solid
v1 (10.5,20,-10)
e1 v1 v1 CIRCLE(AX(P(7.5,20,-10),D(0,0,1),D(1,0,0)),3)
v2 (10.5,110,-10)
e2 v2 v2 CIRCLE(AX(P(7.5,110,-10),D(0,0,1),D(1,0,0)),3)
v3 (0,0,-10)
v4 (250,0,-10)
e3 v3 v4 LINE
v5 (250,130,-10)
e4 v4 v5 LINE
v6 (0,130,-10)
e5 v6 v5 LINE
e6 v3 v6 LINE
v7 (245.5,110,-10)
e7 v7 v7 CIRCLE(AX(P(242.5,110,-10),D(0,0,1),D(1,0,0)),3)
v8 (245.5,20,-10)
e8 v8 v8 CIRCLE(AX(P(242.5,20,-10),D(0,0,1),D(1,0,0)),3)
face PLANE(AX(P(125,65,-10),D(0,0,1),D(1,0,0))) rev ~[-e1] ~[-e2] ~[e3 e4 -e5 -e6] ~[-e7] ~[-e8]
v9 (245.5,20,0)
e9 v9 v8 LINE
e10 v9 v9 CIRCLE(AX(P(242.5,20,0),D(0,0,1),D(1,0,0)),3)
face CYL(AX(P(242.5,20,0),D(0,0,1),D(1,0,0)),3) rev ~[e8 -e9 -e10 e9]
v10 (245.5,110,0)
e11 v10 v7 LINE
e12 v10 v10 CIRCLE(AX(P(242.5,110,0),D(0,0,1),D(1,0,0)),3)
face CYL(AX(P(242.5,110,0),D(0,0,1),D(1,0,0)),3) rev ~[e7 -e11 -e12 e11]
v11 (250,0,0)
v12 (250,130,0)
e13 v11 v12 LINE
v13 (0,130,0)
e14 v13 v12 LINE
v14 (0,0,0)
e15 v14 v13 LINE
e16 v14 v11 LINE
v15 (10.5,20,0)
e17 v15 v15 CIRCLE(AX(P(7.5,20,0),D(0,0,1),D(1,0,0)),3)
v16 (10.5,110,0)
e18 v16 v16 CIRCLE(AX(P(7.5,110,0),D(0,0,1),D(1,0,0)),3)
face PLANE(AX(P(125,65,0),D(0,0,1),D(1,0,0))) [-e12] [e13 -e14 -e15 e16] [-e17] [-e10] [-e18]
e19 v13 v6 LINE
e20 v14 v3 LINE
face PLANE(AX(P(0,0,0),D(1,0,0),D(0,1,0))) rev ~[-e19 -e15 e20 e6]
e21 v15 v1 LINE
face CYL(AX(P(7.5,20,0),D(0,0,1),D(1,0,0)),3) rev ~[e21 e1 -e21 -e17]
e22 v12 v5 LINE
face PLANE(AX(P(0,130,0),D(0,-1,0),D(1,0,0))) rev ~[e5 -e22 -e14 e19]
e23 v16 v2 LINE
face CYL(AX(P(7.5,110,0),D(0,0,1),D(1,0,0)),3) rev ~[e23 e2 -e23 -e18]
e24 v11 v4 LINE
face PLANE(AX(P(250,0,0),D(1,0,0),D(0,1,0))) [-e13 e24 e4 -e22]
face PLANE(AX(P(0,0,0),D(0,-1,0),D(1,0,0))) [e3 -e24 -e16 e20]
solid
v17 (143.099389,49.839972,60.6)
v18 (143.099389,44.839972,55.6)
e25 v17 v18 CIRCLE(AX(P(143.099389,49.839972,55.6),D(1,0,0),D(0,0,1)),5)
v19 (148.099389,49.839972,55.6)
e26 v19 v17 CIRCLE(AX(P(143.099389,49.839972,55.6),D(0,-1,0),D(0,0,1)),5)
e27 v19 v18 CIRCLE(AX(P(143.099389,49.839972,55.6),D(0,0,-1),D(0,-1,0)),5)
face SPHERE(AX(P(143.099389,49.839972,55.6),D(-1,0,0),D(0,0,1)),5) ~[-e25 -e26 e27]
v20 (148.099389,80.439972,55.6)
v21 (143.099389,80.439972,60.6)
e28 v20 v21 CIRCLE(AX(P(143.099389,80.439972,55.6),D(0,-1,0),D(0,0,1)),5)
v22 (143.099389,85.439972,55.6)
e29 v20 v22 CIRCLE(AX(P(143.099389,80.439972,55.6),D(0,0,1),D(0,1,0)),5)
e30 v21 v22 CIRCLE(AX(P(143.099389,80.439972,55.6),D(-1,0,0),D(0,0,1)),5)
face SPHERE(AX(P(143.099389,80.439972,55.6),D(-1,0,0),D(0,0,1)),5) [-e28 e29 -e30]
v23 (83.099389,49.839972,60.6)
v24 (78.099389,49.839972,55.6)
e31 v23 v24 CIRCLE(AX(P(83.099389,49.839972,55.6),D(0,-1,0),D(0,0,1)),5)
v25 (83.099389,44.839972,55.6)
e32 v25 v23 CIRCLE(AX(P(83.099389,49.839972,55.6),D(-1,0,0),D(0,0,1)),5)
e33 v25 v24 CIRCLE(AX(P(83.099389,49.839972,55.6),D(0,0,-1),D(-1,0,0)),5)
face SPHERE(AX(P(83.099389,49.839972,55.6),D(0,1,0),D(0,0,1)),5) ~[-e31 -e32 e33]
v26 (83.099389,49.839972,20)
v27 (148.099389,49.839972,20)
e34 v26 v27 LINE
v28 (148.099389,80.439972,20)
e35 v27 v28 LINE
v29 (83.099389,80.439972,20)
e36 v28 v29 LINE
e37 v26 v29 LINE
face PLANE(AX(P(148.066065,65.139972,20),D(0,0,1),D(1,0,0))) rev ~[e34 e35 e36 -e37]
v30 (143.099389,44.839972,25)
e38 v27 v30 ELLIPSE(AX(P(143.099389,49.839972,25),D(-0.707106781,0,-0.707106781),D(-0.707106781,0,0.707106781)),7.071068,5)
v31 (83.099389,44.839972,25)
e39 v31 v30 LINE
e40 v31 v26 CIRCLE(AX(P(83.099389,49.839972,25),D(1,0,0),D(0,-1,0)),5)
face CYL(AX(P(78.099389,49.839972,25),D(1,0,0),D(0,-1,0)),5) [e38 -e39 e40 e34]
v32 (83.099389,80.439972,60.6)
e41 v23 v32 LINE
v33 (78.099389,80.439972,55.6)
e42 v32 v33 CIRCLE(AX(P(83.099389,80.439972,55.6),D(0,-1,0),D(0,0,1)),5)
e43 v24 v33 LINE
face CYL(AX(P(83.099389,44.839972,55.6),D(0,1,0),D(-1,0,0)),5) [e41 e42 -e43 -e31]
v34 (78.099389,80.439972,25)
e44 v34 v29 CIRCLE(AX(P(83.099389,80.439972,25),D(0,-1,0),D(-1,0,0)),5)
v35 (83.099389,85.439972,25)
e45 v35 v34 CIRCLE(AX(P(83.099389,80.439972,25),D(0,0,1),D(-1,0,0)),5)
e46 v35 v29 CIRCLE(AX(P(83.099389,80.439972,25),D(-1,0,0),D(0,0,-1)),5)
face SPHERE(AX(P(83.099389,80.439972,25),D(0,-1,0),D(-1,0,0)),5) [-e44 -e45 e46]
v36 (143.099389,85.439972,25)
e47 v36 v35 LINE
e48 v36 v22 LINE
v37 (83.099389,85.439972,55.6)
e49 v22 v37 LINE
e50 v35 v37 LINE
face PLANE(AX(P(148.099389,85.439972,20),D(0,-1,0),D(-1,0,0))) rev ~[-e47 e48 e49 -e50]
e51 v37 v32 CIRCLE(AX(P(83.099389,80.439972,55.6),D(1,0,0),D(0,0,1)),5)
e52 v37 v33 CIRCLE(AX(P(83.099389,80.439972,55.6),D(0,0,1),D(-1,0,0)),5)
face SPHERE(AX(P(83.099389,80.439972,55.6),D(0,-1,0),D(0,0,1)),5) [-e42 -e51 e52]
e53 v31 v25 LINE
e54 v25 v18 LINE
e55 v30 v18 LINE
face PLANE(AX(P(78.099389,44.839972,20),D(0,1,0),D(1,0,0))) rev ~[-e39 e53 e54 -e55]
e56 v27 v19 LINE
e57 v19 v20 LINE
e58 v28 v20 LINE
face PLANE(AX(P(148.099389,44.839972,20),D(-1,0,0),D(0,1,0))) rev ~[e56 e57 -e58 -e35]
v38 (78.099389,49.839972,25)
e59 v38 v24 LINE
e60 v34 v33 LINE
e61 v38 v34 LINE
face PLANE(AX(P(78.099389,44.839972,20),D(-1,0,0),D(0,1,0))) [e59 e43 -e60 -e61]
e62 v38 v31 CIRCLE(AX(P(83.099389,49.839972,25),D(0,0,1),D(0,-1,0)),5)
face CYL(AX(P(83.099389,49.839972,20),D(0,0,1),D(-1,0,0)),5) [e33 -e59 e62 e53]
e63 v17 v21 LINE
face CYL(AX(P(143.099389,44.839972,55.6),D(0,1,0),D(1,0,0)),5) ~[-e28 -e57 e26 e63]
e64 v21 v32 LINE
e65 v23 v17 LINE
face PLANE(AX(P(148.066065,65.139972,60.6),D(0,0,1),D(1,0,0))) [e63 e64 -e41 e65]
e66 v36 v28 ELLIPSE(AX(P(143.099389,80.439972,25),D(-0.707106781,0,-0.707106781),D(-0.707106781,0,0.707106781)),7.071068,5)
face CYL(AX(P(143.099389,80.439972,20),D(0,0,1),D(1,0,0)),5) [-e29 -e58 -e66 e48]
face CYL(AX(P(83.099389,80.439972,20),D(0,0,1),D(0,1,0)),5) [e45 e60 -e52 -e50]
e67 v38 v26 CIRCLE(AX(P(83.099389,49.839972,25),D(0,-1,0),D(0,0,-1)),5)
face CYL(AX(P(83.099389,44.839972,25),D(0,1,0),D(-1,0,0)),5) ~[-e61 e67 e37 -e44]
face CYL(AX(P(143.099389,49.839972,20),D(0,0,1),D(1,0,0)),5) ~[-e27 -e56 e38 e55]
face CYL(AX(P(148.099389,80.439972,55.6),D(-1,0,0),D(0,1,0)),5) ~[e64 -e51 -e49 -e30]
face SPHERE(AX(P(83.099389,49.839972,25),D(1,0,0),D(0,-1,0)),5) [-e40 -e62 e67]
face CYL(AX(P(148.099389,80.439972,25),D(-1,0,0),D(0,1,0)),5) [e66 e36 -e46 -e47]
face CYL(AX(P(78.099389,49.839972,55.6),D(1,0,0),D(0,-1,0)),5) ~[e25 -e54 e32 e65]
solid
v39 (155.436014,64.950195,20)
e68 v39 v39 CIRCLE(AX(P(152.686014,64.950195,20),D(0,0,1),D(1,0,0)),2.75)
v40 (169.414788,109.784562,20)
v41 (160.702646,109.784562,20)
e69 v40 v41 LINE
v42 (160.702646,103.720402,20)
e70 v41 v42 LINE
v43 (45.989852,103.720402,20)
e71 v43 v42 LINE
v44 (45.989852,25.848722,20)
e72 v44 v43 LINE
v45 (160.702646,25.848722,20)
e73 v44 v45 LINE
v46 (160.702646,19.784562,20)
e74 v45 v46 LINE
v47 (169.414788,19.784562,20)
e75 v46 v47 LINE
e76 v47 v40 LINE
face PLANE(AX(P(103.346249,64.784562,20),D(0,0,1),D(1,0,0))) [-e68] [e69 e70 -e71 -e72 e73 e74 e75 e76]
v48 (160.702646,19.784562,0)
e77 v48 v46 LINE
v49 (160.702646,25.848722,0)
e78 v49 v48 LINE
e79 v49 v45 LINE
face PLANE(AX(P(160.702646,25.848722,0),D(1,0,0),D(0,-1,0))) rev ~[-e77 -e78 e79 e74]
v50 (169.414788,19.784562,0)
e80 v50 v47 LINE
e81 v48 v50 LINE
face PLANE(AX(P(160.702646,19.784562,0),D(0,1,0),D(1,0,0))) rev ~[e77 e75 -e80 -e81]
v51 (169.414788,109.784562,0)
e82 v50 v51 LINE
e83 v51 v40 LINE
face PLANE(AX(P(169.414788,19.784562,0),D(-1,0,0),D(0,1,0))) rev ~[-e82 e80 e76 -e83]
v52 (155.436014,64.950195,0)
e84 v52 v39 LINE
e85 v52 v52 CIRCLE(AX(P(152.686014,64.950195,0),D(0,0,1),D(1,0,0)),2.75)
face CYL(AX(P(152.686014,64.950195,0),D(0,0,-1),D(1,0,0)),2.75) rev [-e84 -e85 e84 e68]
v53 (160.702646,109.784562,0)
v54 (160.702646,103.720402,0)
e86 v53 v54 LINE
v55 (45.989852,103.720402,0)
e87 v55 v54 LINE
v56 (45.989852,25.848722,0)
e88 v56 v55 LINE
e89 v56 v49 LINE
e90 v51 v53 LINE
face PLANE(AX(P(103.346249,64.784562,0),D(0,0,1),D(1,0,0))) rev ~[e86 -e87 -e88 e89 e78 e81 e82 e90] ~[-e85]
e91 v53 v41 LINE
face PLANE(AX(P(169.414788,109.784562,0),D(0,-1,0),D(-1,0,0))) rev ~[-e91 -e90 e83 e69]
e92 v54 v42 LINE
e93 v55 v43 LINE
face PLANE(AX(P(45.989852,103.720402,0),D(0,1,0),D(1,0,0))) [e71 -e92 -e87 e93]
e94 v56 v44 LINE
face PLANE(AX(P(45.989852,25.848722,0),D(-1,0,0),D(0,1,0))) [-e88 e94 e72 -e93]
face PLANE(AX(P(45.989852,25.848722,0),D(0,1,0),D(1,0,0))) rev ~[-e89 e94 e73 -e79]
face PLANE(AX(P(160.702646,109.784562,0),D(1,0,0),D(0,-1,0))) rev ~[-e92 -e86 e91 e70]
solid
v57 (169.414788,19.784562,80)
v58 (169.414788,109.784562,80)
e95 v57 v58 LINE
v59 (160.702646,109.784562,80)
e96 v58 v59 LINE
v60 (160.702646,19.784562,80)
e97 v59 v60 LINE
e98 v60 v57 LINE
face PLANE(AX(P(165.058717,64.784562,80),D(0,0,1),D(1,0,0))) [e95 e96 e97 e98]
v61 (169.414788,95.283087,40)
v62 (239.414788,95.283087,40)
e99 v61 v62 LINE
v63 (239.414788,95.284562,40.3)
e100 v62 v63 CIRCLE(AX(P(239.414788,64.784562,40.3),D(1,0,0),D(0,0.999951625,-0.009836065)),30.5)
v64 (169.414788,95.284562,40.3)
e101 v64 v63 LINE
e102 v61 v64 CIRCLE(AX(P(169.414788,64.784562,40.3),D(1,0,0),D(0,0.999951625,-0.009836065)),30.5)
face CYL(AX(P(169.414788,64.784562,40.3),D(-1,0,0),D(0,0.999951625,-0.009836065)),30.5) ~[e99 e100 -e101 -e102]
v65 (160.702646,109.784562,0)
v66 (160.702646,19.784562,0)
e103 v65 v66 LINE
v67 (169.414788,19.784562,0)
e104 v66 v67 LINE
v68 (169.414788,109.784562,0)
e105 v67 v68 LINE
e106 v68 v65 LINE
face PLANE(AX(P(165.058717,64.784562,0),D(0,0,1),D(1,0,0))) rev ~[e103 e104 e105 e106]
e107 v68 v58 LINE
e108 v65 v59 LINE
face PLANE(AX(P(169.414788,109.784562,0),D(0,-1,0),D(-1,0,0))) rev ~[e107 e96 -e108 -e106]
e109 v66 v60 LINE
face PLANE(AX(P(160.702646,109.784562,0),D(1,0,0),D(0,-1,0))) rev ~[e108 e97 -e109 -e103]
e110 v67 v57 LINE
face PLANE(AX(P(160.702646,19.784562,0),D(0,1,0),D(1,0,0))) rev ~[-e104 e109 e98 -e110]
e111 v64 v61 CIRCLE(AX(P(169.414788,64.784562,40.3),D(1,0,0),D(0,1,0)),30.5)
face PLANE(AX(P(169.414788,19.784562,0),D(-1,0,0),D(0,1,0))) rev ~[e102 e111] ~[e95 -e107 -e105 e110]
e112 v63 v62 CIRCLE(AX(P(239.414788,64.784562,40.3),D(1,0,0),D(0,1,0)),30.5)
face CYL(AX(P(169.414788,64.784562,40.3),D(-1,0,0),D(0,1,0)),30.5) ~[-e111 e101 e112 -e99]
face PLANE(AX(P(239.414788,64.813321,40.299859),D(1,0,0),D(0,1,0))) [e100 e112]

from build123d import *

# Parameters (mm, degrees)
F0_W     = 250
F0_H     = 130
F0_R     = 3
F1_DEPTH = 10
F2_W     = 114.71279338
F2_H     = 77.8716804087
F2_R     = 2.75
F3_DEPTH = 20
F4_DEPTH = 80
F6_W     = 0.0666481256
F6_H     = 40.6
F6_W_2   = 69.9333518744
F7_DEPTH = 40.6
F8_R     = 5
F9_DEPTH = 70


with BuildPart() as f1:
    # F0 (on Top) → F1 (new body)
    with BuildSketch(Plane.XY):
        with Locations((125, 65)):
            Rectangle(F0_W, F0_H)
        with Locations((7.5, 20)):
            Circle(F0_R, mode=Mode.SUBTRACT)
        with Locations((242.5, 20)):
            Circle(F0_R, mode=Mode.SUBTRACT)
        with Locations((7.5, 110)):
            Circle(F0_R, mode=Mode.SUBTRACT)
        with Locations((242.5, 110)):
            Circle(F0_R, mode=Mode.SUBTRACT)
    extrude(amount=-F1_DEPTH)


with BuildPart() as f3:
    # F2 (on Top) → F3 (new body)
    with BuildSketch(Plane.XY):
        with Locations((103.3462490886, 64.7845622897)):
            Rectangle(F2_W, F2_H)
        with Locations((152.6860141896, 64.9501949326)):
            Circle(F2_R, mode=Mode.SUBTRACT)
        Polygon((160.7026457787, 109.7845622897), (160.7026457787, 103.7204024941), (160.7026457787, 25.8487220854), (160.7026457787, 19.7845622897), (169.4147884846, 19.7845622897), (169.4147884846, 109.7845622897), align=None)
    extrude(amount=F3_DEPTH)


with BuildPart() as f4:
    # F2 (on Top) → F4 (new body)
    with BuildSketch(Plane.XY):
        Polygon((160.7026457787, 109.7845622897), (160.7026457787, 103.7204024941), (160.7026457787, 25.8487220854), (160.7026457787, 19.7845622897), (169.4147884846, 19.7845622897), (169.4147884846, 109.7845622897), align=None)
    extrude(amount=F4_DEPTH)

    # F5 (on face) → F9 (join)
    with BuildSketch(Plane.YZ.offset(169.4147884846)):
        with BuildLine():
            ThreePointArc((95.2830868442, 40), (95.2841934261, 40.1499981859), (95.2845622897, 40.3))
            ThreePointArc((95.2845622897, 40.3), (64.6345604756, 70.7996311364), (34.2860377352, 40))
            ThreePointArc((34.2860377352, 40), (64.7845622897, 9.8), (95.2830868442, 40))
        make_face()
    extrude(amount=F9_DEPTH)


with BuildPart() as f7:
    # F6 (on face) → F7 (new body)
    with BuildSketch(Plane.XY.offset(20)):
        with Locations((148.0660647154, 65.1399716735)):
            Rectangle(F6_W, F6_H)
        with Locations((113.0660647154, 65.1399716735)):
            Rectangle(F6_W_2, F6_H)
    extrude(amount=F7_DEPTH)

    # F8
    f8_edges = [f7.edges().sort_by_distance(p)[0] for p in [
        (78.099389, 65.139972, 60.6),
        (113.099389, 85.439972, 60.6),
        (113.099389, 44.839972, 60.6),
        (148.099389, 65.139972, 60.6),
        (148.099389, 44.839972, 40.3),
        (113.099389, 44.839972, 20),
        (78.099389, 44.839972, 40.3),
        (78.099389, 65.139972, 20),
        (78.099389, 85.439972, 40.3),
        (113.099389, 85.439972, 20),
        (148.099389, 85.439972, 40.3),
    ]]
    fillet(f8_edges, radius=F8_R)


solid = Compound([f1.part, f3.part, f4.part, f7.part])
